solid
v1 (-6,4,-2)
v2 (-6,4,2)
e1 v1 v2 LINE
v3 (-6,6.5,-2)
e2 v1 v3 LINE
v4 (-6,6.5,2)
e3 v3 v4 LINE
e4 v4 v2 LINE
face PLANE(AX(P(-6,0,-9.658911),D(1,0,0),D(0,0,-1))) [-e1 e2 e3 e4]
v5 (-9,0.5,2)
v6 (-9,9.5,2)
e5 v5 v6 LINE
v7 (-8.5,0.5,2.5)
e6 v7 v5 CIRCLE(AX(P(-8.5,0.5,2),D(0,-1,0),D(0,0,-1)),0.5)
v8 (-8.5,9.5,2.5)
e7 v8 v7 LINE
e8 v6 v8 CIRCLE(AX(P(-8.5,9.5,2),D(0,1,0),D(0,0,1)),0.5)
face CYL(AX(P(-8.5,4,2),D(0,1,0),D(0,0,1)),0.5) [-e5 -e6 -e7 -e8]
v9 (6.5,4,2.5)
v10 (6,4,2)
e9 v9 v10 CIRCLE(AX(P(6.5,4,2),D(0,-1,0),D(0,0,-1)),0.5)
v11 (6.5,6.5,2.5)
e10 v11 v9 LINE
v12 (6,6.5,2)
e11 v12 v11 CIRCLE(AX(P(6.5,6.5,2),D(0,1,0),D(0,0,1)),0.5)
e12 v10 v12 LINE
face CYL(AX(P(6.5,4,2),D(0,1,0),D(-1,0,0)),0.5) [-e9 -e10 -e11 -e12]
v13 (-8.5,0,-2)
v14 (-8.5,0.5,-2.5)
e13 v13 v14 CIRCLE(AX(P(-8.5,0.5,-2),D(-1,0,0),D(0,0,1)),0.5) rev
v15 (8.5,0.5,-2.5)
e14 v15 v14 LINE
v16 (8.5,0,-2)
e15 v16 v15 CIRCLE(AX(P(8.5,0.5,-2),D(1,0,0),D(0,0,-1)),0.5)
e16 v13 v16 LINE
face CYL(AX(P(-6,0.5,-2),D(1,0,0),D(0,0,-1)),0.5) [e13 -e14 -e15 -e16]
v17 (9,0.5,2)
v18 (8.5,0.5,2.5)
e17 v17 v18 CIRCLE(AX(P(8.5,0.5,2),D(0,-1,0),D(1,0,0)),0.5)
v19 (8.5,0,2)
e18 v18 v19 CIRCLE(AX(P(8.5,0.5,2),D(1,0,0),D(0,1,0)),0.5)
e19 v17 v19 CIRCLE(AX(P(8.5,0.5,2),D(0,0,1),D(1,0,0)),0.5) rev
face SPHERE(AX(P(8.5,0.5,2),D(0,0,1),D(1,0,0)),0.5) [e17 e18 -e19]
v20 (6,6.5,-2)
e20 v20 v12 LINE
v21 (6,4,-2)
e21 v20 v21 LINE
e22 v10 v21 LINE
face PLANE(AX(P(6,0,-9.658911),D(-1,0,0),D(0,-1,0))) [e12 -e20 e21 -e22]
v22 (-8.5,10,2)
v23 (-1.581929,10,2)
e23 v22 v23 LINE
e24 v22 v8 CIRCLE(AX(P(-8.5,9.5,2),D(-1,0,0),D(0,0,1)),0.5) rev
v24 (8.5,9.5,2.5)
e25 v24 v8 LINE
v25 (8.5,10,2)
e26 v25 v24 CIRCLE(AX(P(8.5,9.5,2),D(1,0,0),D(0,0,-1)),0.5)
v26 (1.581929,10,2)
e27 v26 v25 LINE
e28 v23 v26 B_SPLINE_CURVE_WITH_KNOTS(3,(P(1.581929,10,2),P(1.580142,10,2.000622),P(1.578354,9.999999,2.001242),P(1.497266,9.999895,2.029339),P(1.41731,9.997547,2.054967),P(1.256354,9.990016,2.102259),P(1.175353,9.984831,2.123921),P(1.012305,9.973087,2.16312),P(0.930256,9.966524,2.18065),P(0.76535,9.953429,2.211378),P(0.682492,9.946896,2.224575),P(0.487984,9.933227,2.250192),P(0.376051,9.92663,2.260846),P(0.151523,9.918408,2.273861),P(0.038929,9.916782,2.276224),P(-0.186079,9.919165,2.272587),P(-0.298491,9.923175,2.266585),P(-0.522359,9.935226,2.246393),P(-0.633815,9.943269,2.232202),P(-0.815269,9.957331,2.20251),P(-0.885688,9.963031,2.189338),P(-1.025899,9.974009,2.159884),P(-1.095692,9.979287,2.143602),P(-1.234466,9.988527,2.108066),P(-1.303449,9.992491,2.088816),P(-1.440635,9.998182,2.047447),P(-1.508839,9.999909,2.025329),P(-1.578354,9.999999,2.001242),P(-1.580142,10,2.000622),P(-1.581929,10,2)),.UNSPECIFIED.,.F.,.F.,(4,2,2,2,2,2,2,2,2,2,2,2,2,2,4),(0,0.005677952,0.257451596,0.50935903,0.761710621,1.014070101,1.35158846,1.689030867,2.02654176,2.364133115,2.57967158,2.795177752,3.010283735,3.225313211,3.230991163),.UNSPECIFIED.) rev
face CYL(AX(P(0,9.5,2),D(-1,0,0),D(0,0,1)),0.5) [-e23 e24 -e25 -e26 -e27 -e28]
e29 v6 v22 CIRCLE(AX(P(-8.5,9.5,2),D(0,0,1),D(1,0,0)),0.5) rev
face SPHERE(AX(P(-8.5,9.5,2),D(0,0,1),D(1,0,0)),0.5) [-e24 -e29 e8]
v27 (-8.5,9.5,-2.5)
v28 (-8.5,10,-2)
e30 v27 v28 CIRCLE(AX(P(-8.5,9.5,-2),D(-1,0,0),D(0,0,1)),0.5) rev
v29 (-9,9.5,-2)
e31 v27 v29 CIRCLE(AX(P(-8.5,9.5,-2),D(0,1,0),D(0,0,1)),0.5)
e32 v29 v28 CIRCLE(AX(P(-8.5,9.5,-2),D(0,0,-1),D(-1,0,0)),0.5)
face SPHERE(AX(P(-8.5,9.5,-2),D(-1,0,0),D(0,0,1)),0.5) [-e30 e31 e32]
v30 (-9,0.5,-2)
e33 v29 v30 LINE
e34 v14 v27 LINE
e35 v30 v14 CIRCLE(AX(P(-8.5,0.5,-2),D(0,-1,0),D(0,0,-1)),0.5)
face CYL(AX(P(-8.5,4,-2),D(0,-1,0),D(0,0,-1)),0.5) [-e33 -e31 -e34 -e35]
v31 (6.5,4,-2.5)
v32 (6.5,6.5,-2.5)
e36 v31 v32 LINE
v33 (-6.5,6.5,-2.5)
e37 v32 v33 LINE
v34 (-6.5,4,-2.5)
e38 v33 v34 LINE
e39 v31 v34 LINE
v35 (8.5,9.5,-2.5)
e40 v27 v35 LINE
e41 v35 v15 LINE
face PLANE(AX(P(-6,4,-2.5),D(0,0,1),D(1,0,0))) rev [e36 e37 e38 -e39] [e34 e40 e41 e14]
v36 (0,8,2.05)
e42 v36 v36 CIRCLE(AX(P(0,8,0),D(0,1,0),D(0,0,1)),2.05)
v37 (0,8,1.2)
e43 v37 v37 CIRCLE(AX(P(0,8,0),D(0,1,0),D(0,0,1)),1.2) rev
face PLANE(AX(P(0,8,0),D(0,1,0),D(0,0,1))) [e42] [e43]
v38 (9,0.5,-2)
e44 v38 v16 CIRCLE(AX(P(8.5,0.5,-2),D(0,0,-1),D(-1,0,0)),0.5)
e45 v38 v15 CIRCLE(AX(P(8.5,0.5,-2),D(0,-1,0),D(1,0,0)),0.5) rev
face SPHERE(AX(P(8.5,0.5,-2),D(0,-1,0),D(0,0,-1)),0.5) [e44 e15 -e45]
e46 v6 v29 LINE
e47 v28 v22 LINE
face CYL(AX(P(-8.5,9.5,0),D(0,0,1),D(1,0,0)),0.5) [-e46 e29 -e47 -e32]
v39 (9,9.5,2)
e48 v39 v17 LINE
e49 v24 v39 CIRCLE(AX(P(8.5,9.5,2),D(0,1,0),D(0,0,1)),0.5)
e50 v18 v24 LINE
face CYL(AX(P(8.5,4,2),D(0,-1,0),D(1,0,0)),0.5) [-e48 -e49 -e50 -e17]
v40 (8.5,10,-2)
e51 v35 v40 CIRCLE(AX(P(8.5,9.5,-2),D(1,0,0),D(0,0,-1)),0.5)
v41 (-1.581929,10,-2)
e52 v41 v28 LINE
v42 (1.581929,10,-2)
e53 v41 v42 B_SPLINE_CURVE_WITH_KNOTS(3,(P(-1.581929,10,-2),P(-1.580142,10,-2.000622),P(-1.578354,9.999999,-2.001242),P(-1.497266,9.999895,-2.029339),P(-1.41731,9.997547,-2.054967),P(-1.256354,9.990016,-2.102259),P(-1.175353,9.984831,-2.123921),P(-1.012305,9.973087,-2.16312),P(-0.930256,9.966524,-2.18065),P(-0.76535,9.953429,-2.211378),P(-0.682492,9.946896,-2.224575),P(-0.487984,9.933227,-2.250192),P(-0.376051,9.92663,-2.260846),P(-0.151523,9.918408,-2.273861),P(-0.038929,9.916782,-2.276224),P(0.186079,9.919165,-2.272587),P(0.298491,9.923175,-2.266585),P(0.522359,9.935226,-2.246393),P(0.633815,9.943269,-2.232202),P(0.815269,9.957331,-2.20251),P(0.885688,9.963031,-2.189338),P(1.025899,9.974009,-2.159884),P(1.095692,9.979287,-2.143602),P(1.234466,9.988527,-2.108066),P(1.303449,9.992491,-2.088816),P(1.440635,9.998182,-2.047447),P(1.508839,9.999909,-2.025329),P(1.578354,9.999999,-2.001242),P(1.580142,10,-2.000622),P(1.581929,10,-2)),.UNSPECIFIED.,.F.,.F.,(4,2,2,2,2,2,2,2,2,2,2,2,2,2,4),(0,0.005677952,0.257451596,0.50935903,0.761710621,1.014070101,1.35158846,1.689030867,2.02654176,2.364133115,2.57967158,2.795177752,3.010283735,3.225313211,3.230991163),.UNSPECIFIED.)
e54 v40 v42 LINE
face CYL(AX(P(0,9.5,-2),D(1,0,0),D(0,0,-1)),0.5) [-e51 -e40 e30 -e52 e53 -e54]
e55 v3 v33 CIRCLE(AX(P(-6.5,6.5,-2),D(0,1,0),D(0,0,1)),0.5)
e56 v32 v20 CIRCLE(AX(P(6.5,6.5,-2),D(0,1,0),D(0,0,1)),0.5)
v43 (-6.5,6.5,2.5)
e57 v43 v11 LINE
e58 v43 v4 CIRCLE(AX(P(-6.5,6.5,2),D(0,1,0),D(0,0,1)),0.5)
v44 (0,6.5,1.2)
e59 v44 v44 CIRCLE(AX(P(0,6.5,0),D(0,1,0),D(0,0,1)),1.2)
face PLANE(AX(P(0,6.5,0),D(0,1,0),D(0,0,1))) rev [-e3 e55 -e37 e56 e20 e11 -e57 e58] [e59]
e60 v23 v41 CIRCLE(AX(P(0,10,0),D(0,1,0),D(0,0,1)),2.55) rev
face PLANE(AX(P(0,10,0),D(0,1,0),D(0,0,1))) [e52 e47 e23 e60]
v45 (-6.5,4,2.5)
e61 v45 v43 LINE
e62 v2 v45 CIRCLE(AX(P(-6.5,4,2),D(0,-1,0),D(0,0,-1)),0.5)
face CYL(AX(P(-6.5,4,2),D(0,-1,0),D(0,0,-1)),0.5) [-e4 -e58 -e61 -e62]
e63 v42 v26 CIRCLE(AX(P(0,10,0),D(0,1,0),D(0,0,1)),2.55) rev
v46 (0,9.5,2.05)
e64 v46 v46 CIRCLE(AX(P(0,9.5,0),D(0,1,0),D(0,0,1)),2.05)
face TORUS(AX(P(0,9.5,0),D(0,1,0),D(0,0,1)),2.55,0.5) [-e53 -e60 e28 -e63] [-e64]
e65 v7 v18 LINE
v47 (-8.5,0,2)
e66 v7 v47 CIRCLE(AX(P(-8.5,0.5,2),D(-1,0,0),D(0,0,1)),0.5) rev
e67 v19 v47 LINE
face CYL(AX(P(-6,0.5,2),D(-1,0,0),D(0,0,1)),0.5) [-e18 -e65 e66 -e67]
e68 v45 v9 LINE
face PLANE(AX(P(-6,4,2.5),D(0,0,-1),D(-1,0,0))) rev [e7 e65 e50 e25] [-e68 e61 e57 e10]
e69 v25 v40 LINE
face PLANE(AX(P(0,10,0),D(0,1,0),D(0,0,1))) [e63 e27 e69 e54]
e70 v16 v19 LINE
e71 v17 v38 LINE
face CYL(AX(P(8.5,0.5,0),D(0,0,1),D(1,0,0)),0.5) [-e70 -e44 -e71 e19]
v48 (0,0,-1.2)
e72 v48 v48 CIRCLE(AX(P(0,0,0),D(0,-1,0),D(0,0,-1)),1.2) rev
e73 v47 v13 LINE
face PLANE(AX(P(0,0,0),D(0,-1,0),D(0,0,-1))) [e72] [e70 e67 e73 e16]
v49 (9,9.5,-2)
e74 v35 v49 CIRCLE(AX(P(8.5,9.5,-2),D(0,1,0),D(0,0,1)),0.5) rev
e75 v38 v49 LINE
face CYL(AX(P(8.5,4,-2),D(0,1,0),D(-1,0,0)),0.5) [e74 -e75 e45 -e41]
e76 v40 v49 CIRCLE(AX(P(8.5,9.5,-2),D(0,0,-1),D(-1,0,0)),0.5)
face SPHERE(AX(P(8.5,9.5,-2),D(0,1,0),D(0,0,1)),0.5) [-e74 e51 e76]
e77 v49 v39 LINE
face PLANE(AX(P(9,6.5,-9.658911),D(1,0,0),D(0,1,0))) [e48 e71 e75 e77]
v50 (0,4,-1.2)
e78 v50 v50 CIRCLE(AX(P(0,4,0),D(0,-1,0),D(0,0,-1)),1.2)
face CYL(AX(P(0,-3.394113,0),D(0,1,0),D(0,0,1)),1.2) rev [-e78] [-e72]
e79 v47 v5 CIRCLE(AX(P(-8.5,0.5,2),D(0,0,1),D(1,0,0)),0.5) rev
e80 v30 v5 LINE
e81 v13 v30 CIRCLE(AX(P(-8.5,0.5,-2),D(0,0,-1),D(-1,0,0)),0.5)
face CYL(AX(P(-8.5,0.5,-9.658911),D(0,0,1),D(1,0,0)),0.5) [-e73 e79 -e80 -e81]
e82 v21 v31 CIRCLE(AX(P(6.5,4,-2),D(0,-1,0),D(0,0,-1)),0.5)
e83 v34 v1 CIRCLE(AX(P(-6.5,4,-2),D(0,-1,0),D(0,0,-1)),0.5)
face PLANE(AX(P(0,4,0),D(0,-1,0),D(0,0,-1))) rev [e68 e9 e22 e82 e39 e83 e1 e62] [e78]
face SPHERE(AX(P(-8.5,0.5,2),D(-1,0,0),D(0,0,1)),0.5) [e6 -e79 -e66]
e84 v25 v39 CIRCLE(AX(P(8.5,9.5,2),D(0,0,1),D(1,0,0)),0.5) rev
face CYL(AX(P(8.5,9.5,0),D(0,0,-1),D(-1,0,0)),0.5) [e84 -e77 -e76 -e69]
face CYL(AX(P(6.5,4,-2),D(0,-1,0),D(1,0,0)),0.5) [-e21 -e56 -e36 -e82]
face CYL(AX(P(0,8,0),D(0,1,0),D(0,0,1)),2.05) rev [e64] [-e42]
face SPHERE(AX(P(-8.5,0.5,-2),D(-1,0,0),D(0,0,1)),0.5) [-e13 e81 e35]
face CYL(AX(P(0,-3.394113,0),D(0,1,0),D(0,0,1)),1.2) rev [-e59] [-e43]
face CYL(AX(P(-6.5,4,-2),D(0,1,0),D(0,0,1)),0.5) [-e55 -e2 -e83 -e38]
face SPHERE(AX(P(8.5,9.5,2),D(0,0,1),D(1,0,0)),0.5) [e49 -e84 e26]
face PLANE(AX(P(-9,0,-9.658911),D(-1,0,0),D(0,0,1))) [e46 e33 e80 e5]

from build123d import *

# Parameters (mm, degrees)
SKETCH1_W           = 12
SKETCH1_H           = 5
BOSS_EXTRUDE1_DEPTH = 4
SKETCH2_W           = 3
SKETCH2_H           = 6.5
BOSS_EXTRUDE2_DEPTH = 5
SKETCH3_W           = 18
SKETCH3_H           = 5
BOSS_EXTRUDE3_DEPTH = 3.5
CUT_EXTRUDE1_REACH  = 15.684
SKETCH4_R           = 1.2
SKETCH5_R           = 2.05
CUT_EXTRUDE2_DEPTH  = 2
FILLET1_R           = 0.5


with BuildPart() as part:
    # Sketch1 → Boss-Extrude1 (new body)
    with BuildSketch(Plane(origin=(0, 0, 0), x_dir=(1, 0, 0), z_dir=(0, 1, 0))):
        Rectangle(SKETCH1_W, SKETCH1_H)
    extrude(amount=BOSS_EXTRUDE1_DEPTH)

    # Sketch2 → Boss-Extrude2 (add)
    with BuildSketch(Plane.XY.offset(2.5)):
        with Locations((-7.5, 3.25)):
            Rectangle(SKETCH2_W, SKETCH2_H)
        with Locations((7.5, 3.25)):
            Rectangle(SKETCH2_W, SKETCH2_H)
    extrude(amount=-BOSS_EXTRUDE2_DEPTH)

    # Sketch3 → Boss-Extrude3 (add)
    with BuildSketch(Plane(origin=(0, 6.5, 0), x_dir=(1, 0, 0), z_dir=(0, 1, 0))):
        Rectangle(SKETCH3_W, SKETCH3_H)
    extrude(amount=BOSS_EXTRUDE3_DEPTH)

    # Cut-Extrude1: up to this face of the body (flat: up to its plane)
    cut_extrude1_end = Plane(part.part.faces().sort_by_distance((0, 0, 0))[0])
    # Sketch4 → Cut-Extrude1 (cut, up to the picked face)
    with BuildSketch(Plane(origin=(0, 10, 0), x_dir=(1, 0, 0), z_dir=(0, 1, 0)), mode=Mode.PRIVATE) as cut_extrude1_sk1:
        with Locations(Location((0, 0, 0), (0, 0, 270))):
            Circle(SKETCH4_R)
    cut_extrude1_tool1 = split(extrude(cut_extrude1_sk1.sketch, amount=-CUT_EXTRUDE1_REACH, mode=Mode.PRIVATE), bisect_by=cut_extrude1_end, keep=Keep.BOTH, mode=Mode.PRIVATE)
    add(cut_extrude1_tool1.solids().sort_by(Axis((0, 10, 0), (0, -1, 0)))[0], mode=Mode.SUBTRACT)

    # Sketch5 → Cut-Extrude2 (cut)
    with BuildSketch(Plane(origin=(0, 10, 0), x_dir=(1, 0, 0), z_dir=(0, 1, 0))):
        with Locations(Location((0, 0, 0), (0, 0, 270))):
            Circle(SKETCH5_R)
    extrude(amount=-CUT_EXTRUDE2_DEPTH, mode=Mode.SUBTRACT)

    # Fillet1
    # the kernel refuses this fillet: 0.5 mm, written as the material it takes off along each edge
    with BuildSketch(Plane(origin=(-8.5, 0.5, 2), x_dir=(0, -1, 0), z_dir=(0, 0, 1))) as fillet1_piece_1_section:
        Polygon((0, 0), (FILLET1_R, 0), (FILLET1_R, -FILLET1_R), (0, -FILLET1_R), align=None)
    fillet1_piece_1 = extrude(amount=FILLET1_R, mode=Mode.PRIVATE)
    fillet1_piece_1 = fillet1_piece_1 - Plane(origin=(-8.5, 0.5, 2), x_dir=(0.7071067811865475, 0.7071067811865475, 0), z_dir=(0, 0, 1)) * Sphere(FILLET1_R, mode=Mode.PRIVATE)
    add(fillet1_piece_1, mode=Mode.SUBTRACT)
    with BuildSketch(Plane(origin=(-8.5, 0.5, -2), x_dir=(-1, 0, 0), z_dir=(0, -1, 0))) as fillet1_piece_2_section:
        Polygon((0, 0), (FILLET1_R, 0), (FILLET1_R, FILLET1_R), (0, FILLET1_R), align=None)
    fillet1_piece_2 = extrude(amount=FILLET1_R, mode=Mode.PRIVATE)
    fillet1_piece_2 = fillet1_piece_2 - Plane(origin=(-8.5, 0.5, -2), x_dir=(0.7071067811865475, 0, 0.7071067811865475), z_dir=(0, -1, 0)) * Sphere(FILLET1_R, mode=Mode.PRIVATE)
    add(fillet1_piece_2, mode=Mode.SUBTRACT)
    with BuildSketch(Plane(origin=(-8.5, 9.5, 2), x_dir=(-1, 0, 0), z_dir=(0, 0, 1))) as fillet1_piece_3_section:
        Polygon((0, 0), (FILLET1_R, 0), (FILLET1_R, -FILLET1_R), (0, -FILLET1_R), align=None)
    fillet1_piece_3 = extrude(amount=FILLET1_R, mode=Mode.PRIVATE)
    fillet1_piece_3 = fillet1_piece_3 - Plane(origin=(-8.5, 9.5, 2), x_dir=(0.7071067811865475, -0.7071067811865475, 0), z_dir=(0, 0, 1)) * Sphere(FILLET1_R, mode=Mode.PRIVATE)
    add(fillet1_piece_3, mode=Mode.SUBTRACT)
    with BuildSketch(Plane(origin=(-8.5, 9.5, -2), x_dir=(-1, 0, 0), z_dir=(0, 0, -1))) as fillet1_piece_4_section:
        Polygon((0, 0), (FILLET1_R, 0), (FILLET1_R, FILLET1_R), (0, FILLET1_R), align=None)
    fillet1_piece_4 = extrude(amount=FILLET1_R, mode=Mode.PRIVATE)
    fillet1_piece_4 = fillet1_piece_4 - Plane(origin=(-8.5, 9.5, -2), x_dir=(0.7071067811865475, -0.7071067811865475, 0), z_dir=(0, 0, -1)) * Sphere(FILLET1_R, mode=Mode.PRIVATE)
    add(fillet1_piece_4, mode=Mode.SUBTRACT)
    with BuildSketch(Plane(origin=(8.5, 0.5, 2), x_dir=(0, -1, 0), z_dir=(0, 0, 1))) as fillet1_piece_5_section:
        Polygon((0, 0), (FILLET1_R, 0), (FILLET1_R, FILLET1_R), (0, FILLET1_R), align=None)
    fillet1_piece_5 = extrude(amount=FILLET1_R, mode=Mode.PRIVATE)
    fillet1_piece_5 = fillet1_piece_5 - Plane(origin=(8.5, 0.5, 2), x_dir=(-0.7071067811865476, 0.7071067811865475, 0), z_dir=(0, 0, 1)) * Sphere(FILLET1_R, mode=Mode.PRIVATE)
    add(fillet1_piece_5, mode=Mode.SUBTRACT)
    with BuildSketch(Plane(origin=(8.5, 0.5, -2), x_dir=(1, 0, 0), z_dir=(0, -1, 0))) as fillet1_piece_6_section:
        Polygon((0, 0), (FILLET1_R, 0), (FILLET1_R, -FILLET1_R), (0, -FILLET1_R), align=None)
    fillet1_piece_6 = extrude(amount=FILLET1_R, mode=Mode.PRIVATE)
    fillet1_piece_6 = fillet1_piece_6 - Plane(origin=(8.5, 0.5, -2), x_dir=(-0.7071067811865475, 0, 0.7071067811865475), z_dir=(0, -1, 0)) * Sphere(FILLET1_R, mode=Mode.PRIVATE)
    add(fillet1_piece_6, mode=Mode.SUBTRACT)
    with BuildSketch(Plane(origin=(8.5, 9.5, 2), x_dir=(0, 1, 0), z_dir=(0, 0, 1))) as fillet1_piece_7_section:
        Polygon((0, 0), (FILLET1_R, 0), (FILLET1_R, -FILLET1_R), (0, -FILLET1_R), align=None)
    fillet1_piece_7 = extrude(amount=FILLET1_R, mode=Mode.PRIVATE)
    fillet1_piece_7 = fillet1_piece_7 - Plane(origin=(8.5, 9.5, 2), x_dir=(-0.7071067811865475, -0.7071067811865477, 0), z_dir=(0, 0, 1)) * Sphere(FILLET1_R, mode=Mode.PRIVATE)
    add(fillet1_piece_7, mode=Mode.SUBTRACT)
    with BuildSketch(Plane(origin=(8.5, 9.5, -2), x_dir=(0, 1, 0), z_dir=(0, 0, -1))) as fillet1_piece_8_section:
        Polygon((0, 0), (FILLET1_R, 0), (FILLET1_R, FILLET1_R), (0, FILLET1_R), align=None)
    fillet1_piece_8 = extrude(amount=FILLET1_R, mode=Mode.PRIVATE)
    fillet1_piece_8 = fillet1_piece_8 - Plane(origin=(8.5, 9.5, -2), x_dir=(-0.7071067811865475, -0.7071067811865477, 0), z_dir=(0, 0, -1)) * Sphere(FILLET1_R, mode=Mode.PRIVATE)
    add(fillet1_piece_8, mode=Mode.SUBTRACT)
    with BuildSketch(Plane(origin=(-9, 0, 2), x_dir=(1, 0, 0), z_dir=(0, 0, -1)), Plane(origin=(-9, 10, 2), x_dir=(0, -1, 0), z_dir=(0, 0, -1))) as fillet1_piece_9:
        with BuildLine():
            CenterArc((FILLET1_R, -FILLET1_R), FILLET1_R, 90, 90)
            Line((0, -FILLET1_R), (0, 0))
            Line((0, 0), (FILLET1_R, 0))
        make_face()
    extrude(amount=4, mode=Mode.SUBTRACT)
    with BuildSketch(Plane(origin=(-6, 4, 2.5), x_dir=(-1, 0, 0), z_dir=(0, 1, 0)), Plane(origin=(-6, 4, -2.5), x_dir=(0, 0, 1), z_dir=(0, 1, 0))) as fillet1_piece_10:
        with BuildLine():
            CenterArc((FILLET1_R, -FILLET1_R), FILLET1_R, 90, 90)
            Line((0, -FILLET1_R), (0, 0))
            Line((0, 0), (FILLET1_R, 0))
        make_face()
    extrude(amount=2.5, mode=Mode.SUBTRACT)
    with BuildSketch(Plane(origin=(-9, 9.5, 2.5), x_dir=(1, 0, 0), z_dir=(0, -1, 0)), Plane(origin=(-9, 9.5, -2.5), x_dir=(0, 0, 1), z_dir=(0, -1, 0)), Plane(origin=(9, 0.5, 2.5), x_dir=(-1, 0, 0), z_dir=(0, 1, 0)), Plane(origin=(9, 0.5, -2.5), x_dir=(0, 0, 1), z_dir=(0, 1, 0))) as fillet1_piece_11:
        with BuildLine():
            CenterArc((FILLET1_R, -FILLET1_R), FILLET1_R, 90, 90)
            Line((0, -FILLET1_R), (0, 0))
            Line((0, 0), (FILLET1_R, 0))
        make_face()
    extrude(amount=9, mode=Mode.SUBTRACT)
    with BuildSketch(Plane(origin=(9, 0, 2), x_dir=(-1, 0, 0), z_dir=(0, 0, -1)), Plane(origin=(9, 10, -2), x_dir=(-1, 0, 0), z_dir=(0, 0, 1))) as fillet1_piece_12:
        with BuildLine():
            CenterArc((FILLET1_R, FILLET1_R), FILLET1_R, 180, 90)
            Line((0, FILLET1_R), (0, 0))
            Line((0, 0), (FILLET1_R, 0))
        make_face()
    extrude(amount=4, mode=Mode.SUBTRACT)
    with BuildSketch(Plane(origin=(6, 4, 2.5), x_dir=(1, 0, 0), z_dir=(0, 1, 0)), Plane(origin=(6, 4, -2.5), x_dir=(0, 0, 1), z_dir=(0, 1, 0))) as fillet1_piece_13:
        with BuildLine():
            CenterArc((FILLET1_R, FILLET1_R), FILLET1_R, 180, 90)
            Line((0, FILLET1_R), (0, 0))
            Line((0, 0), (FILLET1_R, 0))
        make_face()
    extrude(amount=2.5, mode=Mode.SUBTRACT)
    with BuildSketch(Plane(origin=(8.5, 10, 2.5), x_dir=(0, -1, 0), z_dir=(-1, 0, 0)), Plane(origin=(-8.5, 0, 2.5), x_dir=(0, 1, 0), z_dir=(1, 0, 0)), Plane(origin=(-8.5, 0, -2.5), x_dir=(0, 0, 1), z_dir=(1, 0, 0))) as fillet1_piece_14:
        with BuildLine():
            CenterArc((FILLET1_R, -FILLET1_R), FILLET1_R, 90, 90)
            Line((0, -FILLET1_R), (0, 0))
            Line((0, 0), (FILLET1_R, 0))
        make_face()
    extrude(amount=17, mode=Mode.SUBTRACT)
    with BuildSketch(Plane(origin=(-8.5, 10, -2.5), x_dir=(0, 0, 1), z_dir=(1, 0, 0))) as fillet1_piece_15:
        with BuildLine():
            CenterArc((FILLET1_R, FILLET1_R), FILLET1_R, 180, 90)
            Line((0, FILLET1_R), (0, 0))
            Line((0, 0), (FILLET1_R, 0))
        make_face()
    extrude(amount=17, mode=Mode.SUBTRACT)
    with BuildSketch(Plane(origin=(0, 10, 0), x_dir=(0, 0, 1), z_dir=(-1, 0, 0))) as fillet1_piece_16:
        with BuildLine():
            CenterArc((2.05 + FILLET1_R, -FILLET1_R), FILLET1_R, 90, 90)
            Line((2.05, -FILLET1_R), (2.05, 0))
            Line((2.05, 0), (2.05 + FILLET1_R, 0))
        make_face()
    revolve(axis=Axis((0, 10, 0), (0, 1, 0)), mode=Mode.SUBTRACT)


solid = part.part
